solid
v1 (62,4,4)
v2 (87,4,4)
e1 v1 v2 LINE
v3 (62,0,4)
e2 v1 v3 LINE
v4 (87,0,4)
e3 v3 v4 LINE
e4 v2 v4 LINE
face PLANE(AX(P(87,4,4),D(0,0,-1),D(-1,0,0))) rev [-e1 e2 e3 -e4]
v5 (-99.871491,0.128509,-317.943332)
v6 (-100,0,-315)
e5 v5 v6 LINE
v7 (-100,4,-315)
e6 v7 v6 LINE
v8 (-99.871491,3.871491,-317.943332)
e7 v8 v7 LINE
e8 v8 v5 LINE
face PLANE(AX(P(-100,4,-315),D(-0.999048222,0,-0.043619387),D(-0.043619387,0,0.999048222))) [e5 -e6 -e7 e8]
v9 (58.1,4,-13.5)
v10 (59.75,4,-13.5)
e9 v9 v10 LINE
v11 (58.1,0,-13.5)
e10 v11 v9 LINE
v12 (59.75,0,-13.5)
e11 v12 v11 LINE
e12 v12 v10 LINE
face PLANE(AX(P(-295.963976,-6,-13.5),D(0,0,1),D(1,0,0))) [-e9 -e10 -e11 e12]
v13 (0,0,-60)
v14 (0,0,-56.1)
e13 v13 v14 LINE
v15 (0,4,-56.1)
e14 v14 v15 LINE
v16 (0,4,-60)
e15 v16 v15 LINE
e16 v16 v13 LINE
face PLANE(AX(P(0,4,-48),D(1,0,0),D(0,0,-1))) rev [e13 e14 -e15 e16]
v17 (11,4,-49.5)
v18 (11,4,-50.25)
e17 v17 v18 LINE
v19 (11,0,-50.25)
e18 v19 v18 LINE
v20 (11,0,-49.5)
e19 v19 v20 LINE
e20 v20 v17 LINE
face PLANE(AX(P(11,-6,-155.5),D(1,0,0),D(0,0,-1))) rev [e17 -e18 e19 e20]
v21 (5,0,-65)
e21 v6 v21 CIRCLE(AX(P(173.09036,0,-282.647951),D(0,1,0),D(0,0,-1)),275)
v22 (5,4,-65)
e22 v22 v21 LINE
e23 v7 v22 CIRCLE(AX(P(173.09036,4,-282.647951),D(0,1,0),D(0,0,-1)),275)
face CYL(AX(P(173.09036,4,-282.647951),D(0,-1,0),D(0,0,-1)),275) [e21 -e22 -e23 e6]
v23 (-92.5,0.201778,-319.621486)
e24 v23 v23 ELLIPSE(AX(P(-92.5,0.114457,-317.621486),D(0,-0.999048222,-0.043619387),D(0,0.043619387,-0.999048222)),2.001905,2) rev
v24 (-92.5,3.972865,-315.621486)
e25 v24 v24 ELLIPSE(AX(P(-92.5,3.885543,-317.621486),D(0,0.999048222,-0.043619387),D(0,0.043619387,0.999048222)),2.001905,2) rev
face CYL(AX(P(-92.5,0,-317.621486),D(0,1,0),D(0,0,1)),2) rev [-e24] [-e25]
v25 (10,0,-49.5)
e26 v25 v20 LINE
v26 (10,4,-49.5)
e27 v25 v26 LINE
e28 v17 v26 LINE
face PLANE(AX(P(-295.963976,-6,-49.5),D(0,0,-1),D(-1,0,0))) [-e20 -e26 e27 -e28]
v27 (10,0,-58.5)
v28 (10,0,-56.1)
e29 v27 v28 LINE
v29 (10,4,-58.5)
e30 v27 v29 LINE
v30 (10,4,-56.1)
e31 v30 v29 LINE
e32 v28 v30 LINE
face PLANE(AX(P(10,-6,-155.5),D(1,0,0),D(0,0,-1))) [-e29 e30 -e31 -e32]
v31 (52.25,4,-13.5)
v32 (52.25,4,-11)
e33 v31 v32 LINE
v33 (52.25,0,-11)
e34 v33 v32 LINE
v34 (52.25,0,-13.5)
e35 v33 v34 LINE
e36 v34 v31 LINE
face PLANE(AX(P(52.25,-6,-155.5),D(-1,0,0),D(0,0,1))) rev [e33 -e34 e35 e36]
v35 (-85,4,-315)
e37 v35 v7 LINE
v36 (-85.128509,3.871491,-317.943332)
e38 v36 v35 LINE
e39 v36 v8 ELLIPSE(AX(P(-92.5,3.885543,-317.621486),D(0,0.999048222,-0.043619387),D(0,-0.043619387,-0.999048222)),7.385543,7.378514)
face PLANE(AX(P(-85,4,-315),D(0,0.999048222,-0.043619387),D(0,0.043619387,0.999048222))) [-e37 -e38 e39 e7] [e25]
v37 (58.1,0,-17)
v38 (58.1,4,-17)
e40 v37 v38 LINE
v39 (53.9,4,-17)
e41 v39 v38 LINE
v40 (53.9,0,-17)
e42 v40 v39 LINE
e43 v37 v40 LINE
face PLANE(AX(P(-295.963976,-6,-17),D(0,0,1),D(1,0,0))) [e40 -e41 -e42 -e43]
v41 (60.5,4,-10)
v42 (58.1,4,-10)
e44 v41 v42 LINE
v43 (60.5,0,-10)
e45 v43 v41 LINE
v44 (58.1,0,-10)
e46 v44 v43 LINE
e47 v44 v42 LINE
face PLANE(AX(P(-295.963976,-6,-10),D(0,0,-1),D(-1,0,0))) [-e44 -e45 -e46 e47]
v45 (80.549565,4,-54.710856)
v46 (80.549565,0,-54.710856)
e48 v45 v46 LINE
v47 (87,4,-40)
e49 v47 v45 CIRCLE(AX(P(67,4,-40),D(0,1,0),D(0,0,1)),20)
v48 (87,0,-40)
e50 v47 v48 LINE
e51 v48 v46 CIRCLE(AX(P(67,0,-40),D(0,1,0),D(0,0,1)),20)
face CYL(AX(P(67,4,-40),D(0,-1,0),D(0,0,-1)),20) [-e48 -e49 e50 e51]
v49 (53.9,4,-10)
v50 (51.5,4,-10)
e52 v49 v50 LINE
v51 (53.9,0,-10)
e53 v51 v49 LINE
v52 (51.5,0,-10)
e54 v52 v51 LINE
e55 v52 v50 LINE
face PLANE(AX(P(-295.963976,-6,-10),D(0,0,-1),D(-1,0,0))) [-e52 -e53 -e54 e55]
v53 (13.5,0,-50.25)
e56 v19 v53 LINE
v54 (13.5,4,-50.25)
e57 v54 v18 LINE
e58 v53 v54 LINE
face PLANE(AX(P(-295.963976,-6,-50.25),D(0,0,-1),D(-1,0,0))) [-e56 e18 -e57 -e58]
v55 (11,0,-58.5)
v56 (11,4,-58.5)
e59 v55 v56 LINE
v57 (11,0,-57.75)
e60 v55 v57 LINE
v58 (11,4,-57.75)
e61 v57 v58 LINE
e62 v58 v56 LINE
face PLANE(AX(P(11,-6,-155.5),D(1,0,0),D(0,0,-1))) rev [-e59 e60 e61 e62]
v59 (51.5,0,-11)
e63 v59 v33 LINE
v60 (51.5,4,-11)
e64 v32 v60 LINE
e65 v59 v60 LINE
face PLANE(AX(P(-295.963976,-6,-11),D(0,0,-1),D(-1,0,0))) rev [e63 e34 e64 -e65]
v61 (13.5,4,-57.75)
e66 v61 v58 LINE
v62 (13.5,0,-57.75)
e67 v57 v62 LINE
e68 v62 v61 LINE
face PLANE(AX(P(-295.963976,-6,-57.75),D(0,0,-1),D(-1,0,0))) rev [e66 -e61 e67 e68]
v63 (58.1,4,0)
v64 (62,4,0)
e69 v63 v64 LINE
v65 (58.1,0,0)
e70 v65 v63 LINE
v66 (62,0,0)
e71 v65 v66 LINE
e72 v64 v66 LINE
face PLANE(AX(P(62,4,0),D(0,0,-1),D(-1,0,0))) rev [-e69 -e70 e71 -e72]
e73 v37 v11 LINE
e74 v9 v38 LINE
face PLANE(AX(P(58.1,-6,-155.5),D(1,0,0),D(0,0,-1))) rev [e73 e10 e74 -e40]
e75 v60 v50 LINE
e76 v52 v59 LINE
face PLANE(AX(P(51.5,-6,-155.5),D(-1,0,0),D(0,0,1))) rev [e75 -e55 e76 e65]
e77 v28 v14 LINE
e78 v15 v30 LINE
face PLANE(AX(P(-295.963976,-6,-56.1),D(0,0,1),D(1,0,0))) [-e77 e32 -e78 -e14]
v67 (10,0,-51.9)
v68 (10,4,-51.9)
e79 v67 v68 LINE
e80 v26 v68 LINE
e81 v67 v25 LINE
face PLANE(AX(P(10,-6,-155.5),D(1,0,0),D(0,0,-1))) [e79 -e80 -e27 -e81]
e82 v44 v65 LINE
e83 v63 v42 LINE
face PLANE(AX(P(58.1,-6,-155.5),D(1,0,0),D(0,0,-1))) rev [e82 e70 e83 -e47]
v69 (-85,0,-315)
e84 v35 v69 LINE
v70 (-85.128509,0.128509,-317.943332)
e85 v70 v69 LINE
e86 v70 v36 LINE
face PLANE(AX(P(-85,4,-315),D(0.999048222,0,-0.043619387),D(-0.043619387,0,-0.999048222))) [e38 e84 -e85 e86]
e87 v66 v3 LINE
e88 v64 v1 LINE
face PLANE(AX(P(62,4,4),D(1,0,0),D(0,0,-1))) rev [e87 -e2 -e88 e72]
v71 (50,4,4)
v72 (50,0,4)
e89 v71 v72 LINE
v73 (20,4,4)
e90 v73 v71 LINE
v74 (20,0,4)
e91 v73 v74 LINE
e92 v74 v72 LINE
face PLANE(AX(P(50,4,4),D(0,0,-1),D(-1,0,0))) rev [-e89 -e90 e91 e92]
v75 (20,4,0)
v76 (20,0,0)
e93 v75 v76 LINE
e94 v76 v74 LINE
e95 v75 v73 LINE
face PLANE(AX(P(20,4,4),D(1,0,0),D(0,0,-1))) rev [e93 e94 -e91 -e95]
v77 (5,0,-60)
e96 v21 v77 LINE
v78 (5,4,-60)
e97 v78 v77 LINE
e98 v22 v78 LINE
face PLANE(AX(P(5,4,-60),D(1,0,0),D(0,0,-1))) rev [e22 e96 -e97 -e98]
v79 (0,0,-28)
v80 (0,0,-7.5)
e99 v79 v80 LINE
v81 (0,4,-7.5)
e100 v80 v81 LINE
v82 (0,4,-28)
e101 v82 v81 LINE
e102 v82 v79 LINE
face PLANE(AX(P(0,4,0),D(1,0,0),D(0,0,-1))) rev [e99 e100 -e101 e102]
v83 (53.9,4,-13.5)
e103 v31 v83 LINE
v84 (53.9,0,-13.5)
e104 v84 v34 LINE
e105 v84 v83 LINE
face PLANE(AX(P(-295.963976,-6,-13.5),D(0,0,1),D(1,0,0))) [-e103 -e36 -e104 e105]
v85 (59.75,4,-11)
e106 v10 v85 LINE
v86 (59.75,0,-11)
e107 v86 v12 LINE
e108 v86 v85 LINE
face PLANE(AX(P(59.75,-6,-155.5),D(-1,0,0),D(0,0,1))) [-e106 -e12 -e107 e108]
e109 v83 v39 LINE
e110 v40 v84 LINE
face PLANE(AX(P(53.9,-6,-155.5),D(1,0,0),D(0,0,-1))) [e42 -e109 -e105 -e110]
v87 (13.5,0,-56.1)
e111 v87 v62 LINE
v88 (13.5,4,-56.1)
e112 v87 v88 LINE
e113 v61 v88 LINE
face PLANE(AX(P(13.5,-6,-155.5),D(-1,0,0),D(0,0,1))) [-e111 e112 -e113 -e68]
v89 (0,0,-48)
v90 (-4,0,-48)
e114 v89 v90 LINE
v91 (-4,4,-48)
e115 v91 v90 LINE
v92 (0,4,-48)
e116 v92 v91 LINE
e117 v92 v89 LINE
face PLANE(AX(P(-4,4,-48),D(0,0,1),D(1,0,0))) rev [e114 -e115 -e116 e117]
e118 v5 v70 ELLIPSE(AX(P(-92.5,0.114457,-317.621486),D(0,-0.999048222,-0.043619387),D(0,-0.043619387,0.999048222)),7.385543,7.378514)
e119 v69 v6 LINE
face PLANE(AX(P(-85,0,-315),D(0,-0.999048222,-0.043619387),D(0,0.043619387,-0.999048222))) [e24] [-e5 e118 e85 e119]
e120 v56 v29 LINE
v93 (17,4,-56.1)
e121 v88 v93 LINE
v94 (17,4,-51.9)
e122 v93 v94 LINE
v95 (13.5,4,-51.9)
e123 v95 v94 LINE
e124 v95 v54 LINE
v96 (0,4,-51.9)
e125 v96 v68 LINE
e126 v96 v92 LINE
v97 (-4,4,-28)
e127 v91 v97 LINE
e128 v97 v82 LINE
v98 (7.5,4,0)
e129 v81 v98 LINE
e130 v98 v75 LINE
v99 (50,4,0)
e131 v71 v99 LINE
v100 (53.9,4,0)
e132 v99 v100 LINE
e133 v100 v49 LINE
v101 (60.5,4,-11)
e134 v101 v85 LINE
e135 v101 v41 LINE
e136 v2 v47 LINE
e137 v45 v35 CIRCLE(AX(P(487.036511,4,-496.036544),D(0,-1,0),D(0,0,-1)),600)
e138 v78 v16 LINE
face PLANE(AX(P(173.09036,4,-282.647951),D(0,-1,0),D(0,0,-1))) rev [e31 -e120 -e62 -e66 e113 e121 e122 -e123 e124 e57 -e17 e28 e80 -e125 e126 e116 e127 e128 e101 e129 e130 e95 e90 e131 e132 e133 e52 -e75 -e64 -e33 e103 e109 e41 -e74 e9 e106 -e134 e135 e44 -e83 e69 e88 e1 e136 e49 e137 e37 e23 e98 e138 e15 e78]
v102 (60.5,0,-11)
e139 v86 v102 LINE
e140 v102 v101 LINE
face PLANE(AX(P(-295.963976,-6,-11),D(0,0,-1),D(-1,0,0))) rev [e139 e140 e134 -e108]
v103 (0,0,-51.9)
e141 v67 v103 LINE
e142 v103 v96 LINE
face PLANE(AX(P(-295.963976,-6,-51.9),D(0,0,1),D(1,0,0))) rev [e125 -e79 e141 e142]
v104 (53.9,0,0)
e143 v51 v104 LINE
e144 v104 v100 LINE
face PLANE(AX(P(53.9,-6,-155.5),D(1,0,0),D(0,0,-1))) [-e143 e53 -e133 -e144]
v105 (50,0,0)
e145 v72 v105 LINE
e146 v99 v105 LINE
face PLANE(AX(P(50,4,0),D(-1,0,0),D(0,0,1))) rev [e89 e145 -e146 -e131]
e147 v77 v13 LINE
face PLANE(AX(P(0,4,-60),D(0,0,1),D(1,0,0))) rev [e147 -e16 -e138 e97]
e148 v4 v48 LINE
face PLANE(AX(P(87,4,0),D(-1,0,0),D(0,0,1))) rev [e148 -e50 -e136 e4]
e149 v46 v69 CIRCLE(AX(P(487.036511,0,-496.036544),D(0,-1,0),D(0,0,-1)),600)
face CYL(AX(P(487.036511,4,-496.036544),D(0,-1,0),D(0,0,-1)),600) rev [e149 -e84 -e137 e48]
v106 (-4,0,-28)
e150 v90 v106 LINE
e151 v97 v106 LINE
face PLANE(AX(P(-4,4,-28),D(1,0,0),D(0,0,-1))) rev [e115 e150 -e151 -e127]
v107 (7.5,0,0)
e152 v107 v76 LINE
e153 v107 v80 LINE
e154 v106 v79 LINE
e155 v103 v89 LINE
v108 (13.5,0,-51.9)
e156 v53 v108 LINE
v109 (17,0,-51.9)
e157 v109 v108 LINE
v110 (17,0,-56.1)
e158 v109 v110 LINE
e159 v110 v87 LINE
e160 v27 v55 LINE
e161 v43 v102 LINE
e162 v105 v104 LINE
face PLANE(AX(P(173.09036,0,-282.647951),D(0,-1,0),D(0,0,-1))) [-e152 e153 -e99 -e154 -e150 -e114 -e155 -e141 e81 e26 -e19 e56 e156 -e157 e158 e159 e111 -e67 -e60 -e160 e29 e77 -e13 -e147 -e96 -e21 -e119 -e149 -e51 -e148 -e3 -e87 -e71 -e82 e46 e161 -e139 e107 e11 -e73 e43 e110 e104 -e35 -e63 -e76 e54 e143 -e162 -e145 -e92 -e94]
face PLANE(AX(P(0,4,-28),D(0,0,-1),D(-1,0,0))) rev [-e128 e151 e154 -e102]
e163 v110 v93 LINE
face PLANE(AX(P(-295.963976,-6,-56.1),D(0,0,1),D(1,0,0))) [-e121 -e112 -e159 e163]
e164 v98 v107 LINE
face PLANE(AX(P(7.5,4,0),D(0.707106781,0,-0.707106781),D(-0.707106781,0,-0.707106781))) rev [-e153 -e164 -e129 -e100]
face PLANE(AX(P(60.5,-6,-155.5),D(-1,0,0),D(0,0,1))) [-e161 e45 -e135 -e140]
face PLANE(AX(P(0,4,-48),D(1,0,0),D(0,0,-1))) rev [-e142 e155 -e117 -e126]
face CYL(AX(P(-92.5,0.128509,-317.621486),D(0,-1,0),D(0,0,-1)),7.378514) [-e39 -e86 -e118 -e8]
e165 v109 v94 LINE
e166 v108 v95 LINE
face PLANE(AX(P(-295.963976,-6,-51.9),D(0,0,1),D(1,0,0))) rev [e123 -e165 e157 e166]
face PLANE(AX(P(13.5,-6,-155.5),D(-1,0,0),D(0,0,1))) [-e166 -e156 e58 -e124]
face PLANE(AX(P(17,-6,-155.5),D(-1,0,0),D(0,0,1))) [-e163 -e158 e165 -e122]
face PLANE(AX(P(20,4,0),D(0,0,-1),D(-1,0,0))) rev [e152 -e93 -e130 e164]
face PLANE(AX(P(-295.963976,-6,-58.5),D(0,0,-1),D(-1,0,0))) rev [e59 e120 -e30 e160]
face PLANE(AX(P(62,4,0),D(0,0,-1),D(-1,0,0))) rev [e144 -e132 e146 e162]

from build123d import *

# Parameters (mm, degrees)
BOSS_EXTRUDE1_DEPTH = 4
SKETCH3_W           = 15
SKETCH3_H           = 4
BOSS_EXTRUDE2_DEPTH = 10
BOSS_EXTRUDE2_TAPER = 2.5
FILLET1_R           = 7.378514
SKETCH4_R           = 2
CUT_EXTRUDE1_DEPTH  = 341.626738097
CUT_EXTRUDE2_DEPTH  = 10
CHAMFER1_SIZE       = 7.5


with BuildPart() as part:
    # Sketch1 → Boss-Extrude1 (new body)
    with BuildSketch(Plane(origin=(0, 0, 0), x_dir=(1, 0, 0), z_dir=(0, 1, 0))):
        with BuildLine():
            Line((87, 0), (87, -4))
            Line((87, -4), (62, -4))
            Line((62, -4), (62, 0))
            Line((62, 0), (50, 0))
            Line((50, 0), (50, -4))
            Line((50, -4), (20, -4))
            Line((20, -4), (20, 0))
            Line((20, 0), (0, 0))
            Line((0, 0), (0, 28))
            Line((0, 28), (-4, 28))
            Line((-4, 28), (-4, 48))
            Line((-4, 48), (0, 48))
            Line((0, 48), (0, 60))
            Line((0, 60), (5, 60))
            Line((5, 60), (5, 65))
            ThreePointArc((5, 65), (-80.454718631, 176.159018175), (-100, 315))
            Line((-100, 315), (-85, 315))
            ThreePointArc((-85, 315), (-19.238758626, 174.034445441), (80.549564864, 54.710856263))
            ThreePointArc((80.549564864, 54.710856263), (85.316540302, 48.031460101), (87, 40))
            Line((87, 40), (87, 0))
        make_face()
    extrude(amount=BOSS_EXTRUDE1_DEPTH)

    # Sketch3 → Boss-Extrude2 (add)
    with BuildSketch(Plane(origin=(0, 0, -315), x_dir=(-1, 0, 0), z_dir=(0, 0, -1))):
        with Locations((92.5, 2)):
            Rectangle(SKETCH3_W, SKETCH3_H)
    extrude(amount=BOSS_EXTRUDE2_DEPTH, taper=BOSS_EXTRUDE2_TAPER)

    # Fillet1
    fillet1_edges = [part.edges().sort_by_distance(p)[0] for p in [
        (-85.436609429, 2, -325),
        (-99.563390571, 2, -325),
    ]]
    fillet(fillet1_edges, radius=FILLET1_R - 0.0001)  # a hair under: the kernel refuses the full size

    # Sketch4 → Cut-Extrude1 (cut, through all)
    with BuildSketch(Plane(origin=(0, 4, 0), x_dir=(1, 0, 0), z_dir=(0, 1, 0))):
        with Locations(Location((-92.5, 317.621485949, 0), (0, 0, 270))):
            Circle(SKETCH4_R)
    extrude(amount=-CUT_EXTRUDE1_DEPTH, mode=Mode.SUBTRACT)

    # Sketch5 → Cut-Extrude2 (cut)
    with BuildSketch(Plane(origin=(0, 4, 0), x_dir=(1, 0, 0), z_dir=(0, 1, 0))):
        Polygon((53.9, 10), (53.9, 0), (58.1, 0), (58.1, 10), (60.5, 10), (60.5, 11), (59.75, 11), (59.75, 13.5), (58.1, 13.5), (58.1, 17), (53.9, 17), (53.9, 13.5), (52.25, 13.5), (52.25, 11), (51.5, 11), (51.5, 10), align=None)
        Polygon((10, 56.1), (0, 56.1), (0, 51.9), (10, 51.9), (10, 49.5), (11, 49.5), (11, 50.25), (13.5, 50.25), (13.5, 51.9), (17, 51.9), (17, 56.1), (13.5, 56.1), (13.5, 57.75), (11, 57.75), (11, 58.5), (10, 58.5), align=None)
    extrude(amount=-CUT_EXTRUDE2_DEPTH, mode=Mode.SUBTRACT)

    # Chamfer1
    chamfer1_edges = [part.edges().sort_by_distance(p)[0] for p in [
        (0, 2, 0),
    ]]
    chamfer(chamfer1_edges, length=CHAMFER1_SIZE)


solid = part.part
